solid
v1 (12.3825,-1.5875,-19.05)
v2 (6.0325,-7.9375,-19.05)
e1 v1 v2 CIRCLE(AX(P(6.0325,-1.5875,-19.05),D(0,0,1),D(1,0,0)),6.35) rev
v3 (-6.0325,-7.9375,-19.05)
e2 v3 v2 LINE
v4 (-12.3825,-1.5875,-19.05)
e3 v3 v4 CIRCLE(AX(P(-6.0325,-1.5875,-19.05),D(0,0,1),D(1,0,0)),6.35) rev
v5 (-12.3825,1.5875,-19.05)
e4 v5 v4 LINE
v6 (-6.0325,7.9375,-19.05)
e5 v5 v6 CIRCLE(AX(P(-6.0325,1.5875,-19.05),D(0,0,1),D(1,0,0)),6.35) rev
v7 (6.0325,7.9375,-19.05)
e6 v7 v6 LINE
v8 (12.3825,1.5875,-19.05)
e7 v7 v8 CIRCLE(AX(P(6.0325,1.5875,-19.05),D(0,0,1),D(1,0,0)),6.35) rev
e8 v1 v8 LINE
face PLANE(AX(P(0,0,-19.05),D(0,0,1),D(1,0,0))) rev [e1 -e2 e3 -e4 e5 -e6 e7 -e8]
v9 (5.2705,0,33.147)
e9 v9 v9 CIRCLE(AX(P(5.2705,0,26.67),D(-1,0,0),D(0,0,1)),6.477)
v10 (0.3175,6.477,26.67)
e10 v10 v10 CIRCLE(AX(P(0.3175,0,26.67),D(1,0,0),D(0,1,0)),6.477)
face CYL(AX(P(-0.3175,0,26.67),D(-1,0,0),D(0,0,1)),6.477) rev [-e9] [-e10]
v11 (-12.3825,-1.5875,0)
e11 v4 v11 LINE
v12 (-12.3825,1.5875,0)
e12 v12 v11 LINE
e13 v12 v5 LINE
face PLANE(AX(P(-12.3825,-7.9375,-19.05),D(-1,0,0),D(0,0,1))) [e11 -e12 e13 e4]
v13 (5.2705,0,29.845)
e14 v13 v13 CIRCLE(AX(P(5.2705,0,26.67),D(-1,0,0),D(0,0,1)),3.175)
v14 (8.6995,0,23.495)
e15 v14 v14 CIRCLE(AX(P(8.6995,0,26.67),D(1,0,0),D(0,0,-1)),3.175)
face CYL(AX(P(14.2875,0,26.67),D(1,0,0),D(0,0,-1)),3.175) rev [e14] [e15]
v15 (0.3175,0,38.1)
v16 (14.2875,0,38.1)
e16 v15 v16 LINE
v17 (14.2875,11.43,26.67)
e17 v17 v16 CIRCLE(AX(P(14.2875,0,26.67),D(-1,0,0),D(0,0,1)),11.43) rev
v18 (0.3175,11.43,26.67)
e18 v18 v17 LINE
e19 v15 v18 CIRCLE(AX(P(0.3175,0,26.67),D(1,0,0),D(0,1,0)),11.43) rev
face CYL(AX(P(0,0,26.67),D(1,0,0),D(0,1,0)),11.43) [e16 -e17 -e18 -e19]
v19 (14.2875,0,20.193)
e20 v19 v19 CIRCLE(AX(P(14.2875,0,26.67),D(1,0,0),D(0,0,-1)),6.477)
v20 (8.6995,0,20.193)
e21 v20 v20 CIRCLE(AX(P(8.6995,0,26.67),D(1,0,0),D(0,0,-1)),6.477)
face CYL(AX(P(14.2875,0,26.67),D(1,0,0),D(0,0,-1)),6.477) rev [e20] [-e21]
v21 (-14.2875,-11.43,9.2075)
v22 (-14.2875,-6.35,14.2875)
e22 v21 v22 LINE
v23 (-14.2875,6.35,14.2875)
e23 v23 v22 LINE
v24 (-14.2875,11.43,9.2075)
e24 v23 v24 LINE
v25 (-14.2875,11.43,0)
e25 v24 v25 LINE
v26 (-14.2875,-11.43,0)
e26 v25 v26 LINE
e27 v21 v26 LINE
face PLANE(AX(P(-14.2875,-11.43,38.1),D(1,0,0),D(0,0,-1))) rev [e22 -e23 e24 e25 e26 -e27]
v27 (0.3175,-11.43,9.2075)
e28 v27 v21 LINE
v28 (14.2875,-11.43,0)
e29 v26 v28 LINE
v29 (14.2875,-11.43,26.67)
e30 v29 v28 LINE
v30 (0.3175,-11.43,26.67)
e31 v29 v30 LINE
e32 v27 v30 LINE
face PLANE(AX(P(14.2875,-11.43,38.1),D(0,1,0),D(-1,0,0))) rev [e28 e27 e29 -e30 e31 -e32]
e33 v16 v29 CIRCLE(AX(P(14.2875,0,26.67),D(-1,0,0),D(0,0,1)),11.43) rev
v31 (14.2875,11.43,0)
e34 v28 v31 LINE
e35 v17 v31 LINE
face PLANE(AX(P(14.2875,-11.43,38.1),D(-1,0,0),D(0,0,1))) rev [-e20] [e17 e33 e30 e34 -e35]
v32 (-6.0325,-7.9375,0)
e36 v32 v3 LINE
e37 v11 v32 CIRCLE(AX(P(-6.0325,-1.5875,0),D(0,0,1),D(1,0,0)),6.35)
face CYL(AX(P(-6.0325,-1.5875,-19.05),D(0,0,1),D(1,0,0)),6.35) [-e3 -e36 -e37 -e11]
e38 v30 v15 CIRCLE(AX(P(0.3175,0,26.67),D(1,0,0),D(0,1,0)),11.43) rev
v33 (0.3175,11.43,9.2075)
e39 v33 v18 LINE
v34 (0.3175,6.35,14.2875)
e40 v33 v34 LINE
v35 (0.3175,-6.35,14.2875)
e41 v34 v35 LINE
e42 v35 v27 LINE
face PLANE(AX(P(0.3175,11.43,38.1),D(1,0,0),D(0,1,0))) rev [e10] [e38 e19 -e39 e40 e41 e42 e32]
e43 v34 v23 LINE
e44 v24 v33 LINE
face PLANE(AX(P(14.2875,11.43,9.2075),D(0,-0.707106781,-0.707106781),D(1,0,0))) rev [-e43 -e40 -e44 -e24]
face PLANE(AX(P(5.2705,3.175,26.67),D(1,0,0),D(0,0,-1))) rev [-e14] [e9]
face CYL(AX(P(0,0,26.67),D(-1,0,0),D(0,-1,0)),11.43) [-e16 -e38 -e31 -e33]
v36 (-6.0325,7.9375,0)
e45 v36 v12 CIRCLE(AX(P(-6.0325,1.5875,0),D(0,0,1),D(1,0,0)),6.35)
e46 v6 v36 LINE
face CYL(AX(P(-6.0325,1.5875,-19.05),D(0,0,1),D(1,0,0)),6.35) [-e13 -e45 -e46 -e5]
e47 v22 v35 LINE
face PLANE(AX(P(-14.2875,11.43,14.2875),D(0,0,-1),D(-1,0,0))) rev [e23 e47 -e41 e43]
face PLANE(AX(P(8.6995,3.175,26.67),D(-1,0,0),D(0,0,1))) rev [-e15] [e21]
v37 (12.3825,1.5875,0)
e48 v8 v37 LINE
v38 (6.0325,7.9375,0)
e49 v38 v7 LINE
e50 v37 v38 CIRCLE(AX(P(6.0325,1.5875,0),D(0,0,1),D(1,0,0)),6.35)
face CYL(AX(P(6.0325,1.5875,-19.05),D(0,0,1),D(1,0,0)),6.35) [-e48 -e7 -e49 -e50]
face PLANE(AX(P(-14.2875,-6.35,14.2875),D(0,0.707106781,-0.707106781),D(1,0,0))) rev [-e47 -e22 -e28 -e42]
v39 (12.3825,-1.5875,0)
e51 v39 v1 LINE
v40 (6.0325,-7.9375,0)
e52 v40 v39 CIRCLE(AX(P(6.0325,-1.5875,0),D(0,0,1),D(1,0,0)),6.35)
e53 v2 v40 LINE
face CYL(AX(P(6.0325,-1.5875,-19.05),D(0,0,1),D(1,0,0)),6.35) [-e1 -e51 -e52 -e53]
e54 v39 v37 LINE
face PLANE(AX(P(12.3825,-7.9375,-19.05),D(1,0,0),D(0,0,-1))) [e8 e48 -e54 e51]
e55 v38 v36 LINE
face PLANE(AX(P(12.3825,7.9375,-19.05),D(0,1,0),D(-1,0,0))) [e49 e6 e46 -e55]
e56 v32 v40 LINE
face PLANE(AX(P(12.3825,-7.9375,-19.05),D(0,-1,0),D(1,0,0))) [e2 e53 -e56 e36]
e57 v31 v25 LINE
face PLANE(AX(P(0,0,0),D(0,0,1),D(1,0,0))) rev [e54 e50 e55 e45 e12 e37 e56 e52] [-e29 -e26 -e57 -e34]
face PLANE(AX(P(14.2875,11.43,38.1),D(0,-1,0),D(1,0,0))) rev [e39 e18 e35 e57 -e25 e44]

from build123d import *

# Parameters (mm, degrees)
SKETCH2_W                                            = 24.765
SKETCH2_H                                            = 15.875
BOSS_EXTRUDE1_DEPTH                                  = 19.05
SKETCH3_W                                            = 28.575
SKETCH3_H                                            = 22.86
BOSS_EXTRUDE2_DEPTH                                  = 38.1
SKETCH4_W                                            = 14.605
SKETCH4_H                                            = 23.8125
CUT_EXTRUDE1_DEPTH                                   = 47.6725
FILLET5_R                                            = 11.43
FILLET3_R                                            = 6.35
CHAMFER1_SIZE                                        = 5.08
CBORE_FOR_1_4_FILLISTER_HEAD_MACHINE_SCR_D           = 6.35
CBORE_FOR_1_4_FILLISTER_HEAD_MACHINE_SCR_CBORE_D     = 12.954
CBORE_FOR_1_4_FILLISTER_HEAD_MACHINE_SCR_CBORE_DEPTH = 5.588


with BuildPart() as part:
    # Sketch2 → Boss-Extrude1 (new body)
    with BuildSketch(Plane.XY):
        Rectangle(SKETCH2_W, SKETCH2_H)
    extrude(amount=-BOSS_EXTRUDE1_DEPTH)

    # Sketch3 → Boss-Extrude2 (add)
    with BuildSketch(Plane.XY):
        Rectangle(SKETCH3_W, SKETCH3_H)
    extrude(amount=BOSS_EXTRUDE2_DEPTH)

    # Sketch4 → Cut-Extrude1 (cut, through all)
    with BuildSketch(Plane(origin=(0, -11.43, 0), x_dir=(-1, 0, 0), z_dir=(0, -1, 0))):
        with Locations((6.985, -26.19375)):
            Rectangle(SKETCH4_W, SKETCH4_H)
    extrude(amount=-CUT_EXTRUDE1_DEPTH, mode=Mode.SUBTRACT)

    # Fillet5
    fillet5_edges = [part.edges().sort_by_distance(p)[0] for p in [
        (7.3025, -11.43, 38.1),
        (7.3025, 11.43, 38.1),
    ]]
    fillet(fillet5_edges, radius=FILLET5_R - 0.0001)  # a hair under: the kernel refuses the full size

    # Fillet3
    fillet3_edges = [part.edges().sort_by_distance(p)[0] for p in [
        (-12.3825, 7.9375, -9.525),
        (12.3825, 7.9375, -9.525),
        (12.3825, -7.9375, -9.525),
        (-12.3825, -7.9375, -9.525),
    ]]
    fillet(fillet3_edges, radius=FILLET3_R)

    # Chamfer1
    chamfer1_edges = [part.edges().sort_by_distance(p)[0] for p in [
        (-6.985, 11.43, 14.2875),
        (-6.985, -11.43, 14.2875),
    ]]
    chamfer(chamfer1_edges, length=CHAMFER1_SIZE)

    # CBORE for 1/4 Fillister Head Machine Screw1 (through all)
    with Locations(Plane(origin=(14.2875, 0, 26.67), x_dir=(0, 0, 1), z_dir=(1, 0, 0))):
        with Locations((0, 0)):
            cbore_for_1_4_fillister_head_machine_scr = CounterBoreHole(CBORE_FOR_1_4_FILLISTER_HEAD_MACHINE_SCR_D / 2, CBORE_FOR_1_4_FILLISTER_HEAD_MACHINE_SCR_CBORE_D / 2, CBORE_FOR_1_4_FILLISTER_HEAD_MACHINE_SCR_CBORE_DEPTH)

    # Mirror1: CBORE for 1/4 Fillister Head Machine Screw1 across plane
    add(cbore_for_1_4_fillister_head_machine_scr.mirror(Plane(origin=(6.985, 0, 0), x_dir=(0, 0, 1), z_dir=(1, 0, 0))), mode=Mode.SUBTRACT)


solid = part.part
